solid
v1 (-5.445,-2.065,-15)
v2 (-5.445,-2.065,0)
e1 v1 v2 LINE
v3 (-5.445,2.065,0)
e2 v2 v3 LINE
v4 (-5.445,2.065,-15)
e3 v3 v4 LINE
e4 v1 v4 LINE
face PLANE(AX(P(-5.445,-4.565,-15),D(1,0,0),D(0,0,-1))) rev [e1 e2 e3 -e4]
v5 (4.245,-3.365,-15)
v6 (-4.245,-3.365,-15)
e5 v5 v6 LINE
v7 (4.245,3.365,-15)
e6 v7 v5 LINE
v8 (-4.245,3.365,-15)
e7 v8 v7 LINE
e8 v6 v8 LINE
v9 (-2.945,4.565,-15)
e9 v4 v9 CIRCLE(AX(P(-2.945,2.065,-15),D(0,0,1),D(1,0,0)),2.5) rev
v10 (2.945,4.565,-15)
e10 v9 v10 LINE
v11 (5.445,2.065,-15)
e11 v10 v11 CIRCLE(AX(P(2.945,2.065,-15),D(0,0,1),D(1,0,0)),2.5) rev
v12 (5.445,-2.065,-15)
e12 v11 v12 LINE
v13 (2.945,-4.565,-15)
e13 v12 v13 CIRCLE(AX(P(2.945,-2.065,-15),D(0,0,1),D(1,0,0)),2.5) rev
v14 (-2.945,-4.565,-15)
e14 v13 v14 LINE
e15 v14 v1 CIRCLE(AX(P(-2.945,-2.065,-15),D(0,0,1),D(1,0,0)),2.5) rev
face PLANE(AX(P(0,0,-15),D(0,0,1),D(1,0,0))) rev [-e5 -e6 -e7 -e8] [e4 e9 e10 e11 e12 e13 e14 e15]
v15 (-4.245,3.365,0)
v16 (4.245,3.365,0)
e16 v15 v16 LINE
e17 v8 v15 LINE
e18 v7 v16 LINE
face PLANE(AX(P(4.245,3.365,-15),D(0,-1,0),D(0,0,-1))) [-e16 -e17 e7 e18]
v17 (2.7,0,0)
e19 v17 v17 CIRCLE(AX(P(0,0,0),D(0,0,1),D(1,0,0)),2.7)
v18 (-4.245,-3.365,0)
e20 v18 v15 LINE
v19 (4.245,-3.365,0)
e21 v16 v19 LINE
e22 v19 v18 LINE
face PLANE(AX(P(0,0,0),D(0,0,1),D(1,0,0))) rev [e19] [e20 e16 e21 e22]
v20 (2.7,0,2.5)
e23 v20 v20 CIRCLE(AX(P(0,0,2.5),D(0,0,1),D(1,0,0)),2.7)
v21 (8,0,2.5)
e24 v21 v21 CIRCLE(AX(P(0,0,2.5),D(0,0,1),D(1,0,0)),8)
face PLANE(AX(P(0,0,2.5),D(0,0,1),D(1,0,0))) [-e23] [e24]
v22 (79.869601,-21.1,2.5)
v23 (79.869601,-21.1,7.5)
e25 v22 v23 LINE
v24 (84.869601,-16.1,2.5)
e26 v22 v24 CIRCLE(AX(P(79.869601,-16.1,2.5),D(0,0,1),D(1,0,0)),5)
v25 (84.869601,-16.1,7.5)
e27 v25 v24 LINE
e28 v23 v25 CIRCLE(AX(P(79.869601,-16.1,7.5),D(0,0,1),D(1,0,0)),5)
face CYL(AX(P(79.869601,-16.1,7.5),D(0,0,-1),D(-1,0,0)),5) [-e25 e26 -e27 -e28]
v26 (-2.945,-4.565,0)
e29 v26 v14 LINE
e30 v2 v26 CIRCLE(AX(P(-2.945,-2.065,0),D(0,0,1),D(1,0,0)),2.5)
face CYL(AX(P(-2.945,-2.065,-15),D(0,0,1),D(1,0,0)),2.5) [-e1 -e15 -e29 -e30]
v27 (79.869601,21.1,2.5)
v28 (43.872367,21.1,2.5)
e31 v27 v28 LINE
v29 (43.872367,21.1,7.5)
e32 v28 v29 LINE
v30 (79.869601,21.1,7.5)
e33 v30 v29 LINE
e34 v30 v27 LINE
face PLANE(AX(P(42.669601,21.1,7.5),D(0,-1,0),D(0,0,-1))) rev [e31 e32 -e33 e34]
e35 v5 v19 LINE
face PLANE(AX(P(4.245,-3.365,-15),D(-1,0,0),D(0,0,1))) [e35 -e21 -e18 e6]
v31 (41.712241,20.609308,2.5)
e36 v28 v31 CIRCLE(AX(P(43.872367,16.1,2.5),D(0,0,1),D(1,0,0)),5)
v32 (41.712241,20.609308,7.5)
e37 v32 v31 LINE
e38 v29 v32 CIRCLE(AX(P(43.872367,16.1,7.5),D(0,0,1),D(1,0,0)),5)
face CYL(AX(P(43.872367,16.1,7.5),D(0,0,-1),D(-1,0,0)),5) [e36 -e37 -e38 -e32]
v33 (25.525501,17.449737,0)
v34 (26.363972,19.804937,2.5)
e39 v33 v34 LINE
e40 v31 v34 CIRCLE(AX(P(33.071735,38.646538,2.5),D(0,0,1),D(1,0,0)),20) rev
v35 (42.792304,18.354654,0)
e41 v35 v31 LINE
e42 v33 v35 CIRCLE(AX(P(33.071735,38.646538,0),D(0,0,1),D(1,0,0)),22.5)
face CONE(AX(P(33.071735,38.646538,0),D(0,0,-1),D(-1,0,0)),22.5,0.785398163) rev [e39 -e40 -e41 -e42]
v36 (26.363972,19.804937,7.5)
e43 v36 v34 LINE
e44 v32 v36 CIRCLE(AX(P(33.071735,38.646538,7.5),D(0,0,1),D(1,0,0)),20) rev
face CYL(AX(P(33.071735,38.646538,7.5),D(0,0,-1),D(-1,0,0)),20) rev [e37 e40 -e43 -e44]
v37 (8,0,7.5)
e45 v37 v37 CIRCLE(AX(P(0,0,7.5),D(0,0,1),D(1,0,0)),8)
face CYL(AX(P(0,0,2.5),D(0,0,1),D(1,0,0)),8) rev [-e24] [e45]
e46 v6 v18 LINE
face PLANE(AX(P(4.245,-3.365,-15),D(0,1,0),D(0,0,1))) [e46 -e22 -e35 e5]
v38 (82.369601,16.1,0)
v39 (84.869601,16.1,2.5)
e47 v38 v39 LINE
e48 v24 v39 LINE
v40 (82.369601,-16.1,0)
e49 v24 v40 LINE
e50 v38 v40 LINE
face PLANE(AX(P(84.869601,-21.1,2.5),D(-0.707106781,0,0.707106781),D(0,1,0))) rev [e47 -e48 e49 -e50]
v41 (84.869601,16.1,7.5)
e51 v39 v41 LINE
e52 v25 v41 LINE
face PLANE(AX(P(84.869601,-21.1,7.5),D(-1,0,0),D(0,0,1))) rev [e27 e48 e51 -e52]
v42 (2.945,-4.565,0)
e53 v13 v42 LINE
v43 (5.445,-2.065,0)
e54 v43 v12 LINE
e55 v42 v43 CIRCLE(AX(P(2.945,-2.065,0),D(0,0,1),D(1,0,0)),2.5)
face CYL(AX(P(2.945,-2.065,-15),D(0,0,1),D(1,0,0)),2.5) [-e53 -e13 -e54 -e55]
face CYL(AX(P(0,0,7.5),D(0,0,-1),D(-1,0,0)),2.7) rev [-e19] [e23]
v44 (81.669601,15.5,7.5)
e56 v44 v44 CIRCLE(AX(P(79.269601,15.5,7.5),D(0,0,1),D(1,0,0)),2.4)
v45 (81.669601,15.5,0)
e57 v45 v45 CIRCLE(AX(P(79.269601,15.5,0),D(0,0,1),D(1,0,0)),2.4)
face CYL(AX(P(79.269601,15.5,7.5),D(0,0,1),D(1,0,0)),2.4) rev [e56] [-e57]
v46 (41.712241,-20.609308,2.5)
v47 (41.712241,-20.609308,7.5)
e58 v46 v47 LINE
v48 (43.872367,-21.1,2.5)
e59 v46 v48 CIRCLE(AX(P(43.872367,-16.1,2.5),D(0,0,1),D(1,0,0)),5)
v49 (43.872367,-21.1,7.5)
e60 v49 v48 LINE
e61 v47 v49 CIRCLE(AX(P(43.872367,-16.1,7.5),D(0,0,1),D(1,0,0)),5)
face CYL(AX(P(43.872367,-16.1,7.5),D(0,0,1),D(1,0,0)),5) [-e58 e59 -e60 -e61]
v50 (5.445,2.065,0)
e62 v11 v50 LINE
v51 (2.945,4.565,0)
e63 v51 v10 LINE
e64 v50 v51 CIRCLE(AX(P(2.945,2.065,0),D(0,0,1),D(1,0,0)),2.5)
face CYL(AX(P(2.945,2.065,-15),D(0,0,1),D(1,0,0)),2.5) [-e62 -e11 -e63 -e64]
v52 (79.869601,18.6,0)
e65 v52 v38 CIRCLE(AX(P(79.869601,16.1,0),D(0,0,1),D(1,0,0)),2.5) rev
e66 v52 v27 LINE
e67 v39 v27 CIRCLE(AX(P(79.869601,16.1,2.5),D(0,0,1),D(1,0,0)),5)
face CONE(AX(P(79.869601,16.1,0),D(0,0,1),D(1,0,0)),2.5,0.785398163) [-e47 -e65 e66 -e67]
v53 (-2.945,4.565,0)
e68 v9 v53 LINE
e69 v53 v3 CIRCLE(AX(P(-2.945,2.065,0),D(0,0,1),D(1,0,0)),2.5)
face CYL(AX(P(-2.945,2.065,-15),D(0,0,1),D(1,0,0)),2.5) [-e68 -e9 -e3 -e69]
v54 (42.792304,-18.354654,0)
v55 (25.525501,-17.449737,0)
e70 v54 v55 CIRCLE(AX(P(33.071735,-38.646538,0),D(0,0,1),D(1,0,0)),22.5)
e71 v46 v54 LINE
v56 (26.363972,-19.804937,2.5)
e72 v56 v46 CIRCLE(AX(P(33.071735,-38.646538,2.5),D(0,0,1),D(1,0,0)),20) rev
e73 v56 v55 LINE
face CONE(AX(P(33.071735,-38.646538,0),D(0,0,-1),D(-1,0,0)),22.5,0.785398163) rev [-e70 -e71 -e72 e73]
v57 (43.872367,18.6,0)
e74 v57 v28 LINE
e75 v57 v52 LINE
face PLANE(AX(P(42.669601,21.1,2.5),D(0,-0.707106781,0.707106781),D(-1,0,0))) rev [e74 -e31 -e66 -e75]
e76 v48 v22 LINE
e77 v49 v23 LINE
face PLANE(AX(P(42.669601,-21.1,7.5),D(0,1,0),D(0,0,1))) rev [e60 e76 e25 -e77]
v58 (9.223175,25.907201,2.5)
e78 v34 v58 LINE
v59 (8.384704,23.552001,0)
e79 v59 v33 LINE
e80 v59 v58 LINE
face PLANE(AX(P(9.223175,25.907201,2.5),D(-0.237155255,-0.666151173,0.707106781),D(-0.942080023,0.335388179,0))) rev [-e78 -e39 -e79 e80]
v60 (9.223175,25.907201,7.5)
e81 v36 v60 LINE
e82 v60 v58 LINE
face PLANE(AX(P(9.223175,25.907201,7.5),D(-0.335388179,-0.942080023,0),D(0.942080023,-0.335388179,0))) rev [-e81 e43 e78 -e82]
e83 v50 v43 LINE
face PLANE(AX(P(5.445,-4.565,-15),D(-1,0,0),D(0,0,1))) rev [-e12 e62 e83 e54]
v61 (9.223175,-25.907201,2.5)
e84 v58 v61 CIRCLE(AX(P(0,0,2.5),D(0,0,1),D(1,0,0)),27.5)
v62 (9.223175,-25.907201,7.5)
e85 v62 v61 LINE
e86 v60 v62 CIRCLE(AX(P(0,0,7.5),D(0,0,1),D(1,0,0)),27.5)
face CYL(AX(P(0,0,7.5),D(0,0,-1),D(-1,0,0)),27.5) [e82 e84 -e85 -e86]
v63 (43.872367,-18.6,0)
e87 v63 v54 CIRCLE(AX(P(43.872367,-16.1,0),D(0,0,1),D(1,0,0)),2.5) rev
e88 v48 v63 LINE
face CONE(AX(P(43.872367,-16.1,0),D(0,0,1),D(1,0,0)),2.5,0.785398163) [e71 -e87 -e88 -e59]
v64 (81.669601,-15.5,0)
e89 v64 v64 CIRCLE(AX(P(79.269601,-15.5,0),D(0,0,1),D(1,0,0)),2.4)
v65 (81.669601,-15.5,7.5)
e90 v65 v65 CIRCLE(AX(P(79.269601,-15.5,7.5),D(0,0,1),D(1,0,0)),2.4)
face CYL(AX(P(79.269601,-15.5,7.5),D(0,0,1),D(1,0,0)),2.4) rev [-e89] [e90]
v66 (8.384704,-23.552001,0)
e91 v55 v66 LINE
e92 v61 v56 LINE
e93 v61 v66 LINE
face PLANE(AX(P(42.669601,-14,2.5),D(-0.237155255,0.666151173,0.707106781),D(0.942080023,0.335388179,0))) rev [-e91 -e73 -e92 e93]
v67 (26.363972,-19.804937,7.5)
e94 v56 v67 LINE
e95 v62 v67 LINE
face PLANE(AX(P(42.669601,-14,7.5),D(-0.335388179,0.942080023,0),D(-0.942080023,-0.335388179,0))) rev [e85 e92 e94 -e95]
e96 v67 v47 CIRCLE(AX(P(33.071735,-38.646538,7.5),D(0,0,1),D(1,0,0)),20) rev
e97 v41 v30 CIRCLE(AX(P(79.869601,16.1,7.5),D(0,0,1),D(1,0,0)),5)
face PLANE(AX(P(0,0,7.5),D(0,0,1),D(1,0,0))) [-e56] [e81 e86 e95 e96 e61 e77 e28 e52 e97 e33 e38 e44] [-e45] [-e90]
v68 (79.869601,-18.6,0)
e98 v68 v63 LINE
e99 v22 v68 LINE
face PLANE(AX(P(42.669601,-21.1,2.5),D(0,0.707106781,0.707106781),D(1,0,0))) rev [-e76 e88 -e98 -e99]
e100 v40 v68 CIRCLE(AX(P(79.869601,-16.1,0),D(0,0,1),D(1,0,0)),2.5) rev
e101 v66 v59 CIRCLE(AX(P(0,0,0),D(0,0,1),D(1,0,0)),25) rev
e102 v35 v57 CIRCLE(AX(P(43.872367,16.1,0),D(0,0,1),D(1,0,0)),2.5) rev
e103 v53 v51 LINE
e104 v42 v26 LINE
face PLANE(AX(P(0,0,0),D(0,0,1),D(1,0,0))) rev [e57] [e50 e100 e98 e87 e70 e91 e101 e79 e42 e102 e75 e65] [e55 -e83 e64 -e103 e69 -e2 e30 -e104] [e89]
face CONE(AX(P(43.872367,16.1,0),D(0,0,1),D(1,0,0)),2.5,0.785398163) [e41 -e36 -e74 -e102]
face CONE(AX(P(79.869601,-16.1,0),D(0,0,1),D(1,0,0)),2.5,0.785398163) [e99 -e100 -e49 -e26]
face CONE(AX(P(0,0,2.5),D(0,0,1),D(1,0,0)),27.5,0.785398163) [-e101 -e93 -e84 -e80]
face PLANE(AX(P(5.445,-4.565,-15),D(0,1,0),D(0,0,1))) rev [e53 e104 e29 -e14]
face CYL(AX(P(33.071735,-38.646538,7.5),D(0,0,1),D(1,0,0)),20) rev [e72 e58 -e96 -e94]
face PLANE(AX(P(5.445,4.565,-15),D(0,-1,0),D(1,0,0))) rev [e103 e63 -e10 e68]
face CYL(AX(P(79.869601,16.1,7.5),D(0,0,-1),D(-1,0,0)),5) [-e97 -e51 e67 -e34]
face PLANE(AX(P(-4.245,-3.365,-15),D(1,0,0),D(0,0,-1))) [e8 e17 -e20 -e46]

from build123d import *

# Parameters (mm, degrees)
SKETCH1_R                    = 1.5
SKETCH1_R_2                  = 2.7
BOSS_EXTRUDE1_DEPTH          = 7.5
SKETCH3_R                    = 8
CUT_EXTRUDE2_DEPTH           = 5
FILLET2_R                    = 20
TALADRO_DE_MARGEN_PARA_M41_D = 4.8
FILLET3_R                    = 5
CHAMFER1_SIZE                = 2.5
SKETCH7_W                    = 10.89
SKETCH7_H                    = 9.13
SKETCH7_W_2                  = 8.49
SKETCH7_H_2                  = 6.73
BOSS_EXTRUDE2_DEPTH          = 15
FILLET5_R                    = 2.5


with BuildPart() as part:
    # Sketch1 → Boss-Extrude1 (new body)
    with BuildSketch(Plane.XY):
        with BuildLine():
            Line((42.669600757, 14), (42.669600757, 21.1))
            Line((42.669600757, 21.1), (84.869600757, 21.1))
            Line((84.869600757, 21.1), (84.869600757, -21.1))
            Line((84.869600757, -21.1), (42.669600757, -21.1))
            Line((42.669600757, -21.1), (42.669600757, -14))
            Line((42.669600757, -14), (9.223174911, -25.907200632))
            ThreePointArc((9.223174911, -25.907200632), (-27.5, 0), (9.223174911, 25.907200632))
            Line((9.223174911, 25.907200632), (42.669600757, 14))
        make_face()
        with Locations((79.269600757, 15.5)):
            Circle(SKETCH1_R, mode=Mode.SUBTRACT)
        with Locations((79.269600757, -15.5)):
            Circle(SKETCH1_R, mode=Mode.SUBTRACT)
        Circle(SKETCH1_R_2, mode=Mode.SUBTRACT)
    extrude(amount=BOSS_EXTRUDE1_DEPTH)

    # Sketch3 → Cut-Extrude2 (cut)
    with BuildSketch(Plane.XY.offset(7.5)):
        Circle(SKETCH3_R)
    extrude(amount=-CUT_EXTRUDE2_DEPTH, mode=Mode.SUBTRACT)

    # Fillet2
    # the kernel refuses this fillet: 20 mm, written as the material it adds along each edge
    with BuildSketch(Plane(origin=(42.669600757, -14, 0), x_dir=(-0.9420800229659998, -0.3353881785757827, 0), z_dir=(0, 0, 1))) as fillet2_piece_1:
        with BuildLine():
            CenterArc((17.308114645, 20), FILLET2_R, 221.725423621, 48.274576379)
            Line((2.381256068, 6.688768163), (2.082718896, 6.422543526))
            ThreePointArc((2.082718896, 6.422543526), (0.813796025, 3.478539353), (-0.376832009, 0.134155271))
            Line((-0.376832009, 0.134155271), (0, -0.4))
            Line((0, -0.4), (17.308114645, -0.4))
            Line((17.308114645, -0.4), (17.308114645, 0))
        make_face()
    extrude(amount=7.5)
    with BuildSketch(Plane(origin=(42.669600757, 14, 0), x_dir=(-0.9420800229659999, 0.3353881785757825, 0), z_dir=(0, 0, 1))) as fillet2_piece_2:
        with BuildLine():
            CenterArc((17.308114645, -20), FILLET2_R, 90, 48.274576379)
            Line((2.381256068, -6.688768163), (2.082718896, -6.422543526))
            ThreePointArc((2.082718896, -6.422543526), (0.813796025, -3.478539353), (-0.376832009, -0.134155271))
            Line((-0.376832009, -0.134155271), (0, 0.4))
            Line((0, 0.4), (17.308114645, 0.4))
            Line((17.308114645, 0.4), (17.308114645, 0))
        make_face()
    extrude(amount=7.5)

    # Taladro de margen para M41 (through all)
    with Locations(Plane.XY.offset(7.5)):
        with Locations((79.269600757, -15.5), (79.269600757, 15.5)):
            Hole(TALADRO_DE_MARGEN_PARA_M41_D / 2)

    # Fillet3
    fillet3_edges = [part.edges().sort_by_distance(p)[0] for p in [
        (42.669600757, 21.1, 3.75),
        (84.869600757, 21.1, 3.75),
        (84.869600757, -21.1, 3.75),
        (42.669600757, -21.1, 3.75),
    ]]
    fillet(fillet3_edges, radius=FILLET3_R)

    # Chamfer1
    chamfer1_edges = [part.edges().sort_by_distance(p)[0] for p in [
        (17.793573313, -22.856068838, 0),
        (-27.5, 0, 0),
        (17.793573313, 22.856068838, 0),
        (34.118456698, 18.673946929, 0),
        (84.869600757, 0, 0),
        (61.870983905, 21.1, 0),
        (61.870983905, -21.1, 0),
        (34.118456698, -18.673946929, 0),
        (42.76478805, 20.975783912, 0),
        (42.76478805, -20.975783912, 0),
        (83.405134663, 19.635533906, 0),
        (83.405134663, -19.635533906, 0),
    ]]
    chamfer(chamfer1_edges, length=CHAMFER1_SIZE)

    # Sketch7 → Boss-Extrude2 (add)
    with BuildSketch(Plane(origin=(0, 0, 0), x_dir=(-1, 0, 0), z_dir=(0, 0, -1))):
        Rectangle(SKETCH7_W, SKETCH7_H)
        Rectangle(SKETCH7_W_2, SKETCH7_H_2, mode=Mode.SUBTRACT)
    extrude(amount=BOSS_EXTRUDE2_DEPTH)

    # Fillet5
    fillet5_edges = [part.edges().sort_by_distance(p)[0] for p in [
        (5.445, 4.565, -7.5),
        (5.445, -4.565, -7.5),
        (-5.445, -4.565, -7.5),
        (-5.445, 4.565, -7.5),
    ]]
    fillet(fillet5_edges, radius=FILLET5_R)


solid = part.part
